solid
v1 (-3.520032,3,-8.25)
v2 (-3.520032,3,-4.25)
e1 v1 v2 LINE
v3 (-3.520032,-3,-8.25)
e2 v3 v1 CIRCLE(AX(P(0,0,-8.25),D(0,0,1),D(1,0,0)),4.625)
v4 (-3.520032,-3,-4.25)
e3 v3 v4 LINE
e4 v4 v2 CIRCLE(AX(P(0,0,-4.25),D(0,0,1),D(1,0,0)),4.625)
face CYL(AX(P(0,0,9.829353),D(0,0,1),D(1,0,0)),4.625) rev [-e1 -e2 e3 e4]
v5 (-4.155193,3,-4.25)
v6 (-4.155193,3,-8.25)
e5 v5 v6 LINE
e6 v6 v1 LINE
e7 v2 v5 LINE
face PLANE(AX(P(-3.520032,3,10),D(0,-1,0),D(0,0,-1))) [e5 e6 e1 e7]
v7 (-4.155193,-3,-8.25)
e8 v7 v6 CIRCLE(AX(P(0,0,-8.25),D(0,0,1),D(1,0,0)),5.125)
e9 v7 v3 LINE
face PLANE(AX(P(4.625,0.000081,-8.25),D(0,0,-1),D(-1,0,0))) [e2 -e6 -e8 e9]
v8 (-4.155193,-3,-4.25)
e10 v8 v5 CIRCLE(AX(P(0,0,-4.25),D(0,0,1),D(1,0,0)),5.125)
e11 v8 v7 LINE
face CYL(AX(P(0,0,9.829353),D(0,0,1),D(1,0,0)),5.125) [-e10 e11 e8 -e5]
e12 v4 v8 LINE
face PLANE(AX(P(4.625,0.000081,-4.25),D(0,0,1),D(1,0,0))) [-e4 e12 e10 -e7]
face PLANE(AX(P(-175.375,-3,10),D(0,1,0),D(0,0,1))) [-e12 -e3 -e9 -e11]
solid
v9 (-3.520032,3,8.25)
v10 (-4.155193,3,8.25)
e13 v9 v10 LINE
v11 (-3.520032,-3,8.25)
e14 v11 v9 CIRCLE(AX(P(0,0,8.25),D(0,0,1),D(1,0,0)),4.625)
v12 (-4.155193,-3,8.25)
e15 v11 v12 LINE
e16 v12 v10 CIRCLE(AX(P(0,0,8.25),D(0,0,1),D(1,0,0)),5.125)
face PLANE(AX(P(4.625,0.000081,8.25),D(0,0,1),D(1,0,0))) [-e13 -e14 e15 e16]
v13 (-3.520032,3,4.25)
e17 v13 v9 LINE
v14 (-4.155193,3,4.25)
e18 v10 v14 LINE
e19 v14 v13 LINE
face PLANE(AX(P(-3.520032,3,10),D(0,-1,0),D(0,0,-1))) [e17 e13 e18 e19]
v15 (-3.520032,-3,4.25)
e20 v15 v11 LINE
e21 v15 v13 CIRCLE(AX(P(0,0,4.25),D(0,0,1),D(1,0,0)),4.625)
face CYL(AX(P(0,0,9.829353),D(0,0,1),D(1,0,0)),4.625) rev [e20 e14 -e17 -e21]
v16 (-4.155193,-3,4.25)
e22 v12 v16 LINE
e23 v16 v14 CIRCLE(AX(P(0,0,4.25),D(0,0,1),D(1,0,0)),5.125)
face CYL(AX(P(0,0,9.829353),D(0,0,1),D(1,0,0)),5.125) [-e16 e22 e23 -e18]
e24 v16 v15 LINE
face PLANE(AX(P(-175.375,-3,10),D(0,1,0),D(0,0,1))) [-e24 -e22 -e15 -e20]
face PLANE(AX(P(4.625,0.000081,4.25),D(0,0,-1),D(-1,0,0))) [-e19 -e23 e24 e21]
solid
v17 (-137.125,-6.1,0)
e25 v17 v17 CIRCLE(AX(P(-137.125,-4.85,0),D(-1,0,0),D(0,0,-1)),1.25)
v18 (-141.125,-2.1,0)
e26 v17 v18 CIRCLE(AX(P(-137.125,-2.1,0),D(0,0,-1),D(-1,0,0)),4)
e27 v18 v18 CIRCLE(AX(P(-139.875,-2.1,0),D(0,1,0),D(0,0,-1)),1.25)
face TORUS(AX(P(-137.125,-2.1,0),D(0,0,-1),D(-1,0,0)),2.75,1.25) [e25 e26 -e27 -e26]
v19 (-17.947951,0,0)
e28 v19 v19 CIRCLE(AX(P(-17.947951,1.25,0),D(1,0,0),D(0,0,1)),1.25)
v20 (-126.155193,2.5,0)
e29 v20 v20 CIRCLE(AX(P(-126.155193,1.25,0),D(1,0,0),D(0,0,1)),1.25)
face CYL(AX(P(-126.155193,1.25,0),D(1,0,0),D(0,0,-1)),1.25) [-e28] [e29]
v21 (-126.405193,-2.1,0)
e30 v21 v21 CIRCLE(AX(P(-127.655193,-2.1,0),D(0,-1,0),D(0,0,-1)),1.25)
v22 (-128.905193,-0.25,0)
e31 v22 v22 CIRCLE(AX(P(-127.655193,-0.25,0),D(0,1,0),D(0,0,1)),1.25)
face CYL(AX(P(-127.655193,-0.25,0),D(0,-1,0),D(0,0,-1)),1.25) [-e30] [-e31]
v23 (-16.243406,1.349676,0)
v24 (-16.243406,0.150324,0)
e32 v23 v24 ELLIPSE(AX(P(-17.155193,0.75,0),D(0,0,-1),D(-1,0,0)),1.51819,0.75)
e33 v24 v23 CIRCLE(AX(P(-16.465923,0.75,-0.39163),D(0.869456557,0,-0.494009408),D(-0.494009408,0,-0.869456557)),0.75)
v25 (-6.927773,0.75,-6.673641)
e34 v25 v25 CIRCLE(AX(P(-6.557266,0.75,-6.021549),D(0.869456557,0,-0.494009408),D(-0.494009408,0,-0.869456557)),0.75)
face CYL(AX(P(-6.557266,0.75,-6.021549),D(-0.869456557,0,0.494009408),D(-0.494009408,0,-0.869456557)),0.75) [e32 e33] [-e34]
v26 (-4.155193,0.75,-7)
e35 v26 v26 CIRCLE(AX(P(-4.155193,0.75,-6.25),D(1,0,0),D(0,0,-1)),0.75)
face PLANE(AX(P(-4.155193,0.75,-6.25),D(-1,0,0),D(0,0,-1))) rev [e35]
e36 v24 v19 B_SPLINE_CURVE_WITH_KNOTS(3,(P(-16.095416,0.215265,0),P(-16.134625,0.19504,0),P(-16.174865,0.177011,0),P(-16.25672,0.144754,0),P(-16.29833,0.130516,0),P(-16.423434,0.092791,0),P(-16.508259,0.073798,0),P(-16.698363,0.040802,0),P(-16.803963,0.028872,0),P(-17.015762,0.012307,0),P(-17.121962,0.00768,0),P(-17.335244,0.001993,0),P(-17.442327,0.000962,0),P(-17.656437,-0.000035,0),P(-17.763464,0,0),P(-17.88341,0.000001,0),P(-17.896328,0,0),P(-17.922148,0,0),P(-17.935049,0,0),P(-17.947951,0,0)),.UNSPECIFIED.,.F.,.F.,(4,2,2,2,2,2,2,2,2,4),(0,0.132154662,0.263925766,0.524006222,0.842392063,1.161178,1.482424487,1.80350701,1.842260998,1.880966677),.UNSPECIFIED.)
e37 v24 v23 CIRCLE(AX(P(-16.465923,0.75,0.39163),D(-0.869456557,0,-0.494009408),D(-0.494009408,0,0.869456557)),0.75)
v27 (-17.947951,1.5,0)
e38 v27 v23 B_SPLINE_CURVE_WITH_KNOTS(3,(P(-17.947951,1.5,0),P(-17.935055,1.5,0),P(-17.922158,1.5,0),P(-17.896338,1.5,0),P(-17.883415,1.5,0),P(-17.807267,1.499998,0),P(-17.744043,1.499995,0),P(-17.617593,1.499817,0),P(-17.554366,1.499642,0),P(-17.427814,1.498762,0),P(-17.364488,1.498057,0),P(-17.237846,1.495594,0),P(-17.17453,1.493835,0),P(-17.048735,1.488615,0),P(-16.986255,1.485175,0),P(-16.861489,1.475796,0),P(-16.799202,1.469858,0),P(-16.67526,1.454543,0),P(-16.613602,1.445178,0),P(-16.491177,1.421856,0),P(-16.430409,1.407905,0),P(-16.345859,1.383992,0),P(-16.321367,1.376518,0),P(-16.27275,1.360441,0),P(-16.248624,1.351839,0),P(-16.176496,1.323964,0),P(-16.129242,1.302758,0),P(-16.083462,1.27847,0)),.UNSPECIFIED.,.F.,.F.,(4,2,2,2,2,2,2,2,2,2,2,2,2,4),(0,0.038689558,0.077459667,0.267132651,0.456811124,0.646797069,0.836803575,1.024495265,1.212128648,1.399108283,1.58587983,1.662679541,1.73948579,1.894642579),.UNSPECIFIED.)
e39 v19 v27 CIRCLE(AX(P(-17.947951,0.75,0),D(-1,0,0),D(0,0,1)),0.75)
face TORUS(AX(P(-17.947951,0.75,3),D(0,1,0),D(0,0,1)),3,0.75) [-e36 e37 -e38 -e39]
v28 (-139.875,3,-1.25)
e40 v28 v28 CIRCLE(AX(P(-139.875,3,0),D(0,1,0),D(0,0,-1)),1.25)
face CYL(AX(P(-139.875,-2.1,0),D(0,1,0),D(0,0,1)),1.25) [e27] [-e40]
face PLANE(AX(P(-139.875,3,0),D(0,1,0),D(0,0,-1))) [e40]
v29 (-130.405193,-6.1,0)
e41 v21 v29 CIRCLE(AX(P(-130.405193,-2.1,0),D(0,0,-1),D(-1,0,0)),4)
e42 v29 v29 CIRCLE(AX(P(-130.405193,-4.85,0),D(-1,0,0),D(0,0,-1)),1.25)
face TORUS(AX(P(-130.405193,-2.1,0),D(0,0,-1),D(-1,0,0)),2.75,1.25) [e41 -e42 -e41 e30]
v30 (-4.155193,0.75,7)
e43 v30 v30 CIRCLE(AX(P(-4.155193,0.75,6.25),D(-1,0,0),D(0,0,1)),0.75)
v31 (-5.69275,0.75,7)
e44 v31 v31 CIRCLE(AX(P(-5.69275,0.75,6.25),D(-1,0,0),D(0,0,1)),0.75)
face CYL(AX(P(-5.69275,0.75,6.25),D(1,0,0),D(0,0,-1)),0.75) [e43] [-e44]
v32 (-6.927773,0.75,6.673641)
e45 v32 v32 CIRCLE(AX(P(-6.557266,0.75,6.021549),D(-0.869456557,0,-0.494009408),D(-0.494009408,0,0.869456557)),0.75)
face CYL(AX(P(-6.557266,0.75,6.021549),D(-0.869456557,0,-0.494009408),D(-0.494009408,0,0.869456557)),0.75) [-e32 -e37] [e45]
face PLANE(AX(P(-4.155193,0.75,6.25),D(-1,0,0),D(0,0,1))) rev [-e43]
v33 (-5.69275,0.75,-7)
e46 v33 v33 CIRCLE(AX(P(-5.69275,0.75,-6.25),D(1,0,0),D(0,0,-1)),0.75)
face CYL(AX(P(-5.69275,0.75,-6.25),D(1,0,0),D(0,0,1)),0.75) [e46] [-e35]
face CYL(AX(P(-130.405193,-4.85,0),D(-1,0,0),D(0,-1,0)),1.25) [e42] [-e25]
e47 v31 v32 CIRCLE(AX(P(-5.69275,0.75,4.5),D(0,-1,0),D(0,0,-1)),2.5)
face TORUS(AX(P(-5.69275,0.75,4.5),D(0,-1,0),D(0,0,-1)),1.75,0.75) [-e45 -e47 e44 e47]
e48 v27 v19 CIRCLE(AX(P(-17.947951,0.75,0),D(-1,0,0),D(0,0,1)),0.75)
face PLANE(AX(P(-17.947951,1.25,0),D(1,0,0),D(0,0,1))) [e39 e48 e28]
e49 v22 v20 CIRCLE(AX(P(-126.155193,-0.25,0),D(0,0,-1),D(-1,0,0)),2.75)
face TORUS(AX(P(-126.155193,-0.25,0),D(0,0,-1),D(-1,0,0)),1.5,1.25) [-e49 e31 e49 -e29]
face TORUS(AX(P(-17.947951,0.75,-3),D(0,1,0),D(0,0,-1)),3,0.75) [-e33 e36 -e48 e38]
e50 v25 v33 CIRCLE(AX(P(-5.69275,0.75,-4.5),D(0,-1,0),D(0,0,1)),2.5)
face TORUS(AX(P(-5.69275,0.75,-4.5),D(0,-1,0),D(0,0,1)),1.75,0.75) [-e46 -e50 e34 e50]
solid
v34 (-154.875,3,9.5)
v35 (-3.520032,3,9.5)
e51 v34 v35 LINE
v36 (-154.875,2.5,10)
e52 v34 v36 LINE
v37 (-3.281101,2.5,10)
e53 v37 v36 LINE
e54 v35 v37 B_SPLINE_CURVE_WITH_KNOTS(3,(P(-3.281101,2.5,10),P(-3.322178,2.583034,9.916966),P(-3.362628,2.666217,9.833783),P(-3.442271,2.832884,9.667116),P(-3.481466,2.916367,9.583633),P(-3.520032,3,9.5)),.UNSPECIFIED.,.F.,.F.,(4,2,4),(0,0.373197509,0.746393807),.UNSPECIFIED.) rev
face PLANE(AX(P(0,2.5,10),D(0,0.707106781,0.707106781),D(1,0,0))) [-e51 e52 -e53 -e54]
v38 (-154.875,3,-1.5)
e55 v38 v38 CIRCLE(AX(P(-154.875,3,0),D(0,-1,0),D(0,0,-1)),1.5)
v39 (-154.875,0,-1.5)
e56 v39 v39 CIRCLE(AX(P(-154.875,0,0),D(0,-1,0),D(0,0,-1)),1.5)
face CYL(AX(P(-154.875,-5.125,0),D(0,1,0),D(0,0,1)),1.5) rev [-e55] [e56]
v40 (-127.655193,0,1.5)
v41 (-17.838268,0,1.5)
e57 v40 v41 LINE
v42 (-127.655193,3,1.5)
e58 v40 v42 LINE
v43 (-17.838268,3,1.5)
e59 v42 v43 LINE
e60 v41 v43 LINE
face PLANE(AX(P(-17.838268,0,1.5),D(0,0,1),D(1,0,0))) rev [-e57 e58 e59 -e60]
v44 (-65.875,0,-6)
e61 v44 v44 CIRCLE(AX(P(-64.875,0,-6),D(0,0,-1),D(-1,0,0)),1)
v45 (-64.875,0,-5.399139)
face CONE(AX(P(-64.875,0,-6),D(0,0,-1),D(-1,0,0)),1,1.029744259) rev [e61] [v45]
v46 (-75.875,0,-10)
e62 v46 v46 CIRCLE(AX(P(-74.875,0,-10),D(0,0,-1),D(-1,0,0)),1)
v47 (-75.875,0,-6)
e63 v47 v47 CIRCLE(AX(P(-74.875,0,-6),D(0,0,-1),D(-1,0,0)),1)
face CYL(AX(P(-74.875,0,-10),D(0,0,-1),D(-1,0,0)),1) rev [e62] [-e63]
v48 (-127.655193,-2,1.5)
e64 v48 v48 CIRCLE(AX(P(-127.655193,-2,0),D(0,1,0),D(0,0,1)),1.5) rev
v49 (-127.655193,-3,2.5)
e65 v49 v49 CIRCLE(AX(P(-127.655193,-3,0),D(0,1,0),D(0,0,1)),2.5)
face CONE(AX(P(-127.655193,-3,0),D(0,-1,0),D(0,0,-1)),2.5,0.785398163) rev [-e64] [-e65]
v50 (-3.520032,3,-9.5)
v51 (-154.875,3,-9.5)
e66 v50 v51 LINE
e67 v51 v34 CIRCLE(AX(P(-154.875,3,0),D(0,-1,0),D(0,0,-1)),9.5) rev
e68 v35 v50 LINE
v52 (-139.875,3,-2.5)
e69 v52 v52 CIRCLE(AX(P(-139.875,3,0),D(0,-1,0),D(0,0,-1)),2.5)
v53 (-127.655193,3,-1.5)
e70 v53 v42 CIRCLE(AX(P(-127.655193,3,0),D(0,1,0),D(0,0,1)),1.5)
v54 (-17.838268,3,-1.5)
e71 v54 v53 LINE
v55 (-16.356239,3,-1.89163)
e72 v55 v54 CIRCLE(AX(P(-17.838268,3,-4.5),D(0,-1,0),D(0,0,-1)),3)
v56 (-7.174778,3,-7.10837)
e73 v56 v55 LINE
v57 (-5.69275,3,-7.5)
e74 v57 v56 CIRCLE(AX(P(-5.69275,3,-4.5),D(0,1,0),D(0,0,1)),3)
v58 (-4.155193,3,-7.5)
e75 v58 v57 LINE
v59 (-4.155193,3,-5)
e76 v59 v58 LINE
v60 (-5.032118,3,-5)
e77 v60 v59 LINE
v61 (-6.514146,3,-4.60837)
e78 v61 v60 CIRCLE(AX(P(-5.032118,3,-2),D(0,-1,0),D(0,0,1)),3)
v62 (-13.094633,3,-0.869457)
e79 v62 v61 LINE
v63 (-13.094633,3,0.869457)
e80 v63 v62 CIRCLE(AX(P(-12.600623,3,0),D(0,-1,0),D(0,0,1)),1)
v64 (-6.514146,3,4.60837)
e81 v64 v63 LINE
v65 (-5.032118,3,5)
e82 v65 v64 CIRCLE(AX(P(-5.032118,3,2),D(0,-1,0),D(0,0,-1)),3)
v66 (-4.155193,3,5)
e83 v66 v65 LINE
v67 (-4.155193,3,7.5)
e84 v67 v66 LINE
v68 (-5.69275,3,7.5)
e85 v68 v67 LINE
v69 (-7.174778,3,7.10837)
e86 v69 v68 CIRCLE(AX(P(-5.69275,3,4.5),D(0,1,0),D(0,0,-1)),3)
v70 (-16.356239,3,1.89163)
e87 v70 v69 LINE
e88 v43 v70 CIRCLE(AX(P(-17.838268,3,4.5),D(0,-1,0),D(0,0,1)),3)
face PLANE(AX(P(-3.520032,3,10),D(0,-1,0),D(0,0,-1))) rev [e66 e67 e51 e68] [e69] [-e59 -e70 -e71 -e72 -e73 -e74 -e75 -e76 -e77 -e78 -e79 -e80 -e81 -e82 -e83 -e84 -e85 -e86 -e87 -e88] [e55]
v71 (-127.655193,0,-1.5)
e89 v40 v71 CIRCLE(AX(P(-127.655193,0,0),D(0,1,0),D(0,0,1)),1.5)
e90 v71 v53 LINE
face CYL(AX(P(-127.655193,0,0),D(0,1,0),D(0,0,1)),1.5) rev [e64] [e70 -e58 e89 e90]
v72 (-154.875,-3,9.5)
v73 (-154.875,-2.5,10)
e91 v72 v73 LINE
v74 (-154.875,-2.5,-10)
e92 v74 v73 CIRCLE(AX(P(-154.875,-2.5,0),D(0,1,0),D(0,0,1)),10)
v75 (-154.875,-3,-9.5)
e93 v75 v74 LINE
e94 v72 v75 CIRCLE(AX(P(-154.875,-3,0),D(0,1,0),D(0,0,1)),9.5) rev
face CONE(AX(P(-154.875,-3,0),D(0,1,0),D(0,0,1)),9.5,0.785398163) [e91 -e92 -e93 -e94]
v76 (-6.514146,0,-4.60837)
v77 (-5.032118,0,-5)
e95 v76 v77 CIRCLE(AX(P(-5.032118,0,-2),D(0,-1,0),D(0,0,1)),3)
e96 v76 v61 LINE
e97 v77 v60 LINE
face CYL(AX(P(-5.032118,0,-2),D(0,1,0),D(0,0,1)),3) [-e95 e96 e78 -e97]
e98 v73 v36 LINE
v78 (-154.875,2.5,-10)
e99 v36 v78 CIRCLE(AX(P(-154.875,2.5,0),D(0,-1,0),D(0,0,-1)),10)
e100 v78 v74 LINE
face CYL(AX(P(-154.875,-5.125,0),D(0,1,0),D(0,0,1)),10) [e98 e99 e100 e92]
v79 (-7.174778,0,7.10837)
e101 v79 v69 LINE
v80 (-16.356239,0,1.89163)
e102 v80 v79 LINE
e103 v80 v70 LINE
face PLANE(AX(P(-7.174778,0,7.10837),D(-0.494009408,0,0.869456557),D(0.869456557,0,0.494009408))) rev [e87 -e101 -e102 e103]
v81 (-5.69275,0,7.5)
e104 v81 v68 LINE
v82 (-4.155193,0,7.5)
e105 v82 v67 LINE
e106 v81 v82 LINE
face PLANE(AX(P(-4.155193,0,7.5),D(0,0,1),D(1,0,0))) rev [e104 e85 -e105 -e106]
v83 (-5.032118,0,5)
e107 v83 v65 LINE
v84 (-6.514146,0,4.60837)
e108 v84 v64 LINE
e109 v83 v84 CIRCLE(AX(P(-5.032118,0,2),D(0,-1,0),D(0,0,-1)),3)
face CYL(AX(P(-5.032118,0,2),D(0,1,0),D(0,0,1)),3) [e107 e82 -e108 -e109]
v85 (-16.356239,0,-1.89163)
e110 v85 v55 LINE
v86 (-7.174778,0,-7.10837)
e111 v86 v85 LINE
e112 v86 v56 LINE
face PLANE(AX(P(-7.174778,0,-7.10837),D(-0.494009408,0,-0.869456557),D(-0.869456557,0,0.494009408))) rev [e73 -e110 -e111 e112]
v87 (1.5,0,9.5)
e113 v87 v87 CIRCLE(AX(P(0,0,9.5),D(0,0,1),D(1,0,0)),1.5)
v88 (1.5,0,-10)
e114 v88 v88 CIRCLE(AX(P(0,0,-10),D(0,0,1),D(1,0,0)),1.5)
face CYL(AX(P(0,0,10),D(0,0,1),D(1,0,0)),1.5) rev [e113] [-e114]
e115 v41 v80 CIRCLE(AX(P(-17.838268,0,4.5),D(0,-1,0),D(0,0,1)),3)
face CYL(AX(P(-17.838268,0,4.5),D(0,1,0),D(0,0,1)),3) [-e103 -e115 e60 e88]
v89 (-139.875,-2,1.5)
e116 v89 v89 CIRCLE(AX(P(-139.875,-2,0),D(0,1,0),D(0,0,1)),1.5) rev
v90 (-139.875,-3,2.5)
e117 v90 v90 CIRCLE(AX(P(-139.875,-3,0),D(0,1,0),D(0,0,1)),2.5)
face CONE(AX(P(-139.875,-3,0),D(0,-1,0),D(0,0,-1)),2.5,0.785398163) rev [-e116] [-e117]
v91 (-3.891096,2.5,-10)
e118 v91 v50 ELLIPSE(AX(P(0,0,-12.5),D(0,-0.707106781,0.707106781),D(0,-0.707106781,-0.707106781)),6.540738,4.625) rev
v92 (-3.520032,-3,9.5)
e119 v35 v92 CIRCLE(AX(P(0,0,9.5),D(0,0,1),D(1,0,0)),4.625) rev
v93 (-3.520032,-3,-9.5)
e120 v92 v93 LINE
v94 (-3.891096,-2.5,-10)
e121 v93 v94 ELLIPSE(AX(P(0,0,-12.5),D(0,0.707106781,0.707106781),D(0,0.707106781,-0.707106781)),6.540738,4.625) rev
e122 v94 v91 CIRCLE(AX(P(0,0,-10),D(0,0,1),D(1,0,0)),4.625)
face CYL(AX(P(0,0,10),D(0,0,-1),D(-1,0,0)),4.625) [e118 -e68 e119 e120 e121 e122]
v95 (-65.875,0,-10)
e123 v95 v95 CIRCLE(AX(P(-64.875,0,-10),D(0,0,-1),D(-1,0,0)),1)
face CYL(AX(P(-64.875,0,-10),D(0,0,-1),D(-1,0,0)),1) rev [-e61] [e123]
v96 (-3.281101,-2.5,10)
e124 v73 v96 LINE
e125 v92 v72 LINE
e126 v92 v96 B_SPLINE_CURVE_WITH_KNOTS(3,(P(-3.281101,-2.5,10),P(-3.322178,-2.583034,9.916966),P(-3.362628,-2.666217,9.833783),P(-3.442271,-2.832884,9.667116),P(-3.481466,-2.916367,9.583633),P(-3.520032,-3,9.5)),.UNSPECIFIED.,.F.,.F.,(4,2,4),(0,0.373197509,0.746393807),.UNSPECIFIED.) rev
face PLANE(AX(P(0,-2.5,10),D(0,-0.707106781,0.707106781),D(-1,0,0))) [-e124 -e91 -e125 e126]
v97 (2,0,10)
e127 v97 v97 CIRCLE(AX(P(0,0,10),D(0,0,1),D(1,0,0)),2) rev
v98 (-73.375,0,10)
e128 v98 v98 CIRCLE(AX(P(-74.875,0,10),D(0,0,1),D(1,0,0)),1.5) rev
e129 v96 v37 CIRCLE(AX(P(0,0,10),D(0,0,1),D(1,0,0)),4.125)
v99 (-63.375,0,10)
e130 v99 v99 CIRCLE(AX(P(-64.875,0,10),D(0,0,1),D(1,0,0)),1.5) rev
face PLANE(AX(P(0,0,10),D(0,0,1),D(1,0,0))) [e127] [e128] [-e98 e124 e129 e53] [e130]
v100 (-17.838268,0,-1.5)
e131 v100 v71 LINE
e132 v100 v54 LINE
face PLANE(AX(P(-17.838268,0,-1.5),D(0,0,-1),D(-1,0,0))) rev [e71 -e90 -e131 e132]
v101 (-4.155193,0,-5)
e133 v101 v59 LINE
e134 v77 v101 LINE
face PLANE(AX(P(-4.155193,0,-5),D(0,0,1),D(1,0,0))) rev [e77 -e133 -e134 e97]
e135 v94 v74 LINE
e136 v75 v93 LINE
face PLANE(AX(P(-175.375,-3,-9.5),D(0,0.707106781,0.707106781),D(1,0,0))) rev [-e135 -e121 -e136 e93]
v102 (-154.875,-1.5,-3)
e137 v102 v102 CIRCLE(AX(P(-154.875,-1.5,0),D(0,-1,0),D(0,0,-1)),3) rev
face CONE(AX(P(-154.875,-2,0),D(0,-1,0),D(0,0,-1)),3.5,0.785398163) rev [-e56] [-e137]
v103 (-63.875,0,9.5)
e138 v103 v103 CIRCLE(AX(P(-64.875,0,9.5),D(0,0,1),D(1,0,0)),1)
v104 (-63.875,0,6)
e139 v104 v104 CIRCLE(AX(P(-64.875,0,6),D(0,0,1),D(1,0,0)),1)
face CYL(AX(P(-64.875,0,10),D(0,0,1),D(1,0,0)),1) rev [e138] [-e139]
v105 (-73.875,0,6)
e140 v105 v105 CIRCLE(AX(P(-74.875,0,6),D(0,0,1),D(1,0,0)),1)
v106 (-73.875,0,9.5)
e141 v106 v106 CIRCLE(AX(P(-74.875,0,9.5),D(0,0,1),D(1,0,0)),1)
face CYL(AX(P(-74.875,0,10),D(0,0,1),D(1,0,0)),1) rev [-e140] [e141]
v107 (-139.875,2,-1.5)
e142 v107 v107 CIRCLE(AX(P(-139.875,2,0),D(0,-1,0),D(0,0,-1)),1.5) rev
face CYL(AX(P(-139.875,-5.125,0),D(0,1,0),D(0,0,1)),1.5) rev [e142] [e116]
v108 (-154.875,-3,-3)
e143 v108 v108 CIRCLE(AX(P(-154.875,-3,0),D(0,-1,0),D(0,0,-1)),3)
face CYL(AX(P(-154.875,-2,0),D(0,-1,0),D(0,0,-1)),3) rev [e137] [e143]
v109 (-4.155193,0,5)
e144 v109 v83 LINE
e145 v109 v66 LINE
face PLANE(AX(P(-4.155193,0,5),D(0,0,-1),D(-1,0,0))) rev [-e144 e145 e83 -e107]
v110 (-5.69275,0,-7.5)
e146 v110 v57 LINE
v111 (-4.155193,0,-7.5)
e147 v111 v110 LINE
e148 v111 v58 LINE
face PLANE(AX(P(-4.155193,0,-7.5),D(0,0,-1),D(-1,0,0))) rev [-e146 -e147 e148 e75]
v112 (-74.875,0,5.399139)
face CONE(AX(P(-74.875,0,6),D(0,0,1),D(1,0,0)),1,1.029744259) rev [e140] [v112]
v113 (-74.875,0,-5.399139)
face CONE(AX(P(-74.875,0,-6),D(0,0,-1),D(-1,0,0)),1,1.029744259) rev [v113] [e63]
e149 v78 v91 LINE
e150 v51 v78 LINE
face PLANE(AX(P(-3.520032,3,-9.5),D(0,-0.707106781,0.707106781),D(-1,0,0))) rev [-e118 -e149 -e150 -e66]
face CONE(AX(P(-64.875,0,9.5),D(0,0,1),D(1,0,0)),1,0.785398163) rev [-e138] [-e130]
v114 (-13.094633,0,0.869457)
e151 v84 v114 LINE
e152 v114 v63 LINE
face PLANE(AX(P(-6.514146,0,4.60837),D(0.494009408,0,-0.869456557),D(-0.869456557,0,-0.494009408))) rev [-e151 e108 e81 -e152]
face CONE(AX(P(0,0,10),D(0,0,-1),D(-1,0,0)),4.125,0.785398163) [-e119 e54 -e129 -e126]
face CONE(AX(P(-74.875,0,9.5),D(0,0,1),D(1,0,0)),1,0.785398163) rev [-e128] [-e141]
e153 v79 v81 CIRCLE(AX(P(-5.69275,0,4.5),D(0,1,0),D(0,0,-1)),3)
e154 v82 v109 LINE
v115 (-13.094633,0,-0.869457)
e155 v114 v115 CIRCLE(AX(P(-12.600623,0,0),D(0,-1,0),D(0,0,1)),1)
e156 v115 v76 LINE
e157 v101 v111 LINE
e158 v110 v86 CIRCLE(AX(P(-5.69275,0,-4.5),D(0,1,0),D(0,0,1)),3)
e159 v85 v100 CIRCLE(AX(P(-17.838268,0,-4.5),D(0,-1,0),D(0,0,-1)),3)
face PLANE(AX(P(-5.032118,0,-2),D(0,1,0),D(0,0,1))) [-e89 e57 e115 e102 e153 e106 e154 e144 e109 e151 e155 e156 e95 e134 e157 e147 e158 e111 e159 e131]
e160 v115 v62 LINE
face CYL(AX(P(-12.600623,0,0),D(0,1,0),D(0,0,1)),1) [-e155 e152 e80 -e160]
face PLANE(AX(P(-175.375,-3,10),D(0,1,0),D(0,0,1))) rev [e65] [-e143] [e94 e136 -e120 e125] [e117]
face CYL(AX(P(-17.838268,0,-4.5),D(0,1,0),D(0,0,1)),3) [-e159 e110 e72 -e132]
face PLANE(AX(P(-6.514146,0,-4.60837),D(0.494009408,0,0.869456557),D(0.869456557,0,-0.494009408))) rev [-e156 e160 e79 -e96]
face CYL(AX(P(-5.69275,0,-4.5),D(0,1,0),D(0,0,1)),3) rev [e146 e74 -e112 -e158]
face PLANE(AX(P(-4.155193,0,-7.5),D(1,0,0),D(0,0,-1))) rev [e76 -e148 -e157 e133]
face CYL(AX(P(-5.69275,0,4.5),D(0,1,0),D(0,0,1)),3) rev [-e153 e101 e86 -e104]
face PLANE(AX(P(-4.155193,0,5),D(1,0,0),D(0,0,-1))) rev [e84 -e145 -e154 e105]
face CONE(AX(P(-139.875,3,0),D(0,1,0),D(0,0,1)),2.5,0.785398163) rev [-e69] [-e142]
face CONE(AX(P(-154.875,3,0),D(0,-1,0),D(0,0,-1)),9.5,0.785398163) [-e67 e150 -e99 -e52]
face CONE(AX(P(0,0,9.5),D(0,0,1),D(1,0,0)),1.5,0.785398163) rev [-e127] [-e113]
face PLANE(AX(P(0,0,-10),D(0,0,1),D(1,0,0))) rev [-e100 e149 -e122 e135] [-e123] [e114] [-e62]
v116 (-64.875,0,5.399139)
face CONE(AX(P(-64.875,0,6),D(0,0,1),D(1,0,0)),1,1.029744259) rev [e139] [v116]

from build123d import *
from build123d.topology import SkipClean

# Parameters (mm, degrees)
SALIENTE_EXTRUIR1_DEPTH                = 10
REVOLUCI_N1_START                      = -8.25
REVOLUCI_N1_DEPTH                      = 4
REVOLUCI_N1_START_2                    = 4.25
REVOLUCI_N1_2_DEPTH                    = 4
CORTAR_EXTRUIR1_DEPTH                  = 3
CORTAR_EXTRUIR2_DEPTH                  = 176.734618815
CORTAR_EXTRUIR2_DEPTH_BACK             = 176.734618815
CROQUIS5_R                             = 1.5
CROQUIS7_W                             = 1.5
CROQUIS7_H                             = 20
CHAFL_N1_SIZE                          = 1
CROQUIS8_R                             = 3
CORTAR_EXTRUIR3_DEPTH                  = 1
CHAFL_N2_SIZE                          = 2
CROQUIS9_R                             = 0.75
CROQUIS14_R                            = 1.25
DI_METRO_DE_TALADRO_2_0_2_1_AT_2_COUNT = 2
DI_METRO_DE_TALADRO_2_0_2_1_AT_2_PITCH = 10
CROQUIS18_R                            = 1.25
CHAFL_N3_SIZE                          = 0.5


# Read off the part's stored shape, not the designer's step: Revolución1
with BuildPart() as part:
    # Croquis1 → Saliente-Extruir1 (new, symmetric)
    with BuildSketch(Plane.XY):
        with BuildLine():
            Line((-175.375, 3), (-175.375, -3))
            Line((-175.375, -3), (-3.52003196, -3))
            ThreePointArc((-3.52003196, -3), (4.625, 0), (-3.52003196, 3))
            Line((-3.52003196, 3), (-175.375, 3))
        make_face()
    extrude(amount=SALIENTE_EXTRUIR1_DEPTH, both=True)

    # Croquis4 → Cortar-Extruir1 (cut)
    with BuildSketch(Plane(origin=(0, 3, 0), x_dir=(1, 0, 0), z_dir=(0, 1, 0))):
        with BuildLine():
            Line((-4.155192535, 7.5), (-5.692749875, 7.5))
            ThreePointArc((-5.692749875, 7.5), (-6.459199802, 7.400440399), (-7.174778097, 7.108369672))
            Line((-7.174778097, 7.108369672), (-16.356239343, 1.891630328))
            ThreePointArc((-16.356239343, 1.891630328), (-17.071817639, 1.599559601), (-17.838267566, 1.5))
            Line((-17.838267566, 1.5), (-127.655192535, 1.5))
            ThreePointArc((-127.655192535, 1.5), (-129.155192535, 0), (-127.655192535, -1.5))
            Line((-127.655192535, -1.5), (-17.838267566, -1.5))
            ThreePointArc((-17.838267566, -1.5), (-17.071817639, -1.599559601), (-16.356239343, -1.891630328))
            Line((-16.356239343, -1.891630328), (-7.174778097, -7.108369672))
            ThreePointArc((-7.174778097, -7.108369672), (-6.459199802, -7.400440399), (-5.692749875, -7.5))
            Line((-5.692749875, -7.5), (-4.155192535, -7.5))
            Line((-4.155192535, -7.5), (-4.155192535, -5))
            Line((-4.155192535, -5), (-5.032117503, -5))
            ThreePointArc((-5.032117503, -5), (-5.798567431, -4.900440399), (-6.514145726, -4.608369672))
            Line((-6.514145726, -4.608369672), (-13.094632808, -0.869456557))
            ThreePointArc((-13.094632808, -0.869456557), (-13.6006234, 0), (-13.094632808, 0.869456557))
            Line((-13.094632808, 0.869456557), (-6.514145726, 4.608369672))
            ThreePointArc((-6.514145726, 4.608369672), (-5.798567431, 4.900440399), (-5.032117503, 5))
            Line((-5.032117503, 5), (-4.155192535, 5))
            Line((-4.155192535, 5), (-4.155192535, 7.5))
        make_face()
    extrude(amount=-CORTAR_EXTRUIR1_DEPTH, mode=Mode.SUBTRACT)

    # Croquis5 → Cortar-Extruir2 (cut, two sides: drawn at the far end of the back side and taken through both)
    with SkipClean():  # the faces are left unmerged after this step: merging them gives an invalid solid
        with BuildSketch(Plane(origin=(0, 0, 0), x_dir=(1, 0, 0), z_dir=(0, 1, 0)).offset(-CORTAR_EXTRUIR2_DEPTH_BACK)):
            with Locations(Location((-127.655192535, 0, 0), (0, 0, 270))):
                Circle(CROQUIS5_R)
            with Locations(Location((-154.875, 0, 0), (0, 0, 270))):
                Circle(CROQUIS5_R)
            with Locations(Location((-139.875, 0, 0), (0, 0, 270))):
                Circle(CROQUIS5_R)
            with BuildLine():
                Line((-154.875, -10), (-175.375, -10))
                Line((-175.375, -10), (-175.375, 10))
                Line((-175.375, 10), (-154.875, 10))
                ThreePointArc((-154.875, 10), (-164.875, 0), (-154.875, -10))
            make_face()
        extrude(amount=CORTAR_EXTRUIR2_DEPTH + CORTAR_EXTRUIR2_DEPTH_BACK, mode=Mode.SUBTRACT)
    add(part.part.scale(1), mode=Mode.REPLACE)  # the faces are merged on a copy

    # Croquis7 → Taladros de espiga de Ø3.0mm2 (revolve, cut)
    with BuildSketch(Plane(origin=(0, 0, 10), x_dir=(0, -1, 0), z_dir=(1, 0, 0))):
        with Locations((0.75, 10)):
            Rectangle(CROQUIS7_W, CROQUIS7_H)
    revolve(axis=Axis((0, 0, 16.35), (0, 0, -1)), mode=Mode.SUBTRACT)

    # Chaflán1
    chafl_n1_edges = [part.edges().sort_by_distance(p)[0] for p in [
        (-139.875, -3, -1.5),
        (-139.875, 3, -1.5),
        (-127.655192535, -3, -1.5),
    ]]
    chamfer(chafl_n1_edges, length=CHAFL_N1_SIZE)

    # Croquis8 → Cortar-Extruir3 (cut)
    with BuildSketch(Plane.XZ.offset(3)):
        with Locations(Location((-154.875, 0, 0), (0, 0, 270))):
            Circle(CROQUIS8_R)
    extrude(amount=-CORTAR_EXTRUIR3_DEPTH, mode=Mode.SUBTRACT)

    # Chaflán2
    # the kernel refuses this chamfer: 2 mm, written as the material it takes off along each edge
    with BuildSketch(Plane(origin=(-154.875, -2, 0), x_dir=(0, 0, 1), z_dir=(-1, 0, 0))) as chafl_n2_piece_1_section:
        Polygon((1.5, CHAFL_N2_SIZE), (1.5 + CHAFL_N2_SIZE, 0), (1.5, 0), align=None)
    chafl_n2_piece_1 = revolve(axis=Axis((-154.875, -2, 0), (0, 1, 0)), mode=Mode.PRIVATE)
    chafl_n2_piece_1 = chafl_n2_piece_1 & Plane(origin=(-154.875, -0.742805432, 0), x_dir=(0, 0, -1), z_dir=(0, -1, 0)) * Cylinder(3, 14, mode=Mode.PRIVATE)
    add(chafl_n2_piece_1, mode=Mode.SUBTRACT)

    # Croquis15 → Diámetro de taladro Ø2.0 (2)1 (revolve, cut)
    with BuildSketch(Plane(origin=(-74.875, 0, 10), x_dir=(0, -1, 0), z_dir=(1, 0, 0))):
        Polygon((0, 0), (0, 4.600860619), (1, 4), (1, 0), align=None)
    di_metro_de_taladro_2_0_2_1 = revolve(axis=Axis((-74.875, 0, 16.35), (0, 0, -1)), mode=Mode.SUBTRACT)

    # Diámetro de taladro Ø2.0 (2)1 at 2: Diámetro de taladro Ø2.0 (2)1 ×2
    with Locations(*[(i * DI_METRO_DE_TALADRO_2_0_2_1_AT_2_PITCH, 0, 0) for i in range(1, DI_METRO_DE_TALADRO_2_0_2_1_AT_2_COUNT)]):
        add(di_metro_de_taladro_2_0_2_1, mode=Mode.SUBTRACT)

    # Simetría2: Diámetro de taladro Ø2.0 (2)1 across plane
    add(di_metro_de_taladro_2_0_2_1.mirror(Plane.XY), mode=Mode.SUBTRACT)

    # Simetría2 copy 1 sketch → Simetría2 copy 1 (revolve, cut)
    with BuildSketch(Plane(origin=(-64.875, 0, -10), x_dir=(0, -1, 0), z_dir=(1, 0, 0))):
        Polygon((0, 0), (0, -4.600860619), (1, -4), (1, 0), align=None)
    revolve(axis=Axis((-64.875, 0, -16.35), (0, 0, -1)), mode=Mode.SUBTRACT)

    # Chaflán3
    chafl_n3_edges = [part.edges().sort_by_distance(p)[0] for p in [
        (0, 1.5, 10),
        (4.625, 0, 10),
        (-64.875, 1, 10),
        (-74.875, 1, 10),
        (-79.19751598, 3, 10),
        (-79.19751598, 3, -10),
        (-79.19751598, -3, -10),
        (-79.19751598, -3, 10),
        (-164.875, 3, 0),
        (-164.875, -3, 0),
    ]]
    chamfer(chafl_n3_edges, length=CHAFL_N3_SIZE)


with BuildPart() as body_2:
    # Revolución1 outline → Revolución1 (new body)
    with BuildSketch(Plane.XY.offset(REVOLUCI_N1_START)):
        with BuildLine():
            ThreePointArc((-3.52003196, 3), (4.625, 0), (-3.52003196, -3))
            Line((-3.52003196, -3), (-4.155192535, -3))
            ThreePointArc((-4.155192535, -3), (5.125, 0), (-4.155192535, 3))
            Line((-4.155192535, 3), (-3.52003196, 3))
        make_face()
    extrude(amount=REVOLUCI_N1_DEPTH)


with BuildPart() as body_3:
    # Revoluci_n1 2 outline → Revoluci_n1 2 (new body)
    with BuildSketch(Plane.XY.offset(REVOLUCI_N1_START_2)):
        with BuildLine():
            ThreePointArc((-3.52003196, 3), (4.625, 0), (-3.52003196, -3))
            Line((-3.52003196, -3), (-4.155192535, -3))
            ThreePointArc((-4.155192535, -3), (5.125, 0), (-4.155192535, 3))
            Line((-4.155192535, 3), (-3.52003196, 3))
        make_face()
    extrude(amount=REVOLUCI_N1_2_DEPTH)


with BuildPart() as body_4:
    # Barrer4: sweep along a path in Croquis10
    with BuildLine(Plane(origin=(0, 0, 0), x_dir=(1, 0, 0), z_dir=(0, 1, 0))) as barrer4_path:
        Line((-4.155192535, -6.25), (-5.692749875, -6.25))
        ThreePointArc((-5.692749875, -6.25), (-6.139845666, -6.191923566), (-6.557266338, -6.021548975))
        Line((-6.557266338, -6.021548975), (-15.738727584, -0.804809631))
        Line((-15.738727584, -0.804809631), (-16.465923158, -0.391630328))
        ThreePointArc((-16.465923158, -0.391630328), (-17.181501453, -0.099559601), (-17.947951381, 0))
        Line((-17.947951381, 0), (-126.155192535, 0))
    # Croquis9 → Barrer4 (sweep)
    with BuildSketch(Plane.ZY.offset(4.155192535)):
        with Locations((6.25, 0.75)):
            Circle(CROQUIS9_R)
    sweep(path=barrer4_path.line)

    # Simetría1: body 4 across plane


with BuildPart() as body_4_1:
    add(body_4.part)
    add(body_4.part.mirror(Plane.XY))

    # Barrer6: sweep along a curve in space
    with BuildLine() as barrer6_path:
        Line((-126.405192535, -0.25, 0), (-126.405192535, -2, 0))
        ThreePointArc((-126.155192535, 0, 0), (-126.33196923, -0.073223305, 0), (-126.405192535, -0.25, 0))
        Line((-126.155192535, 0, 0), (-17.947951381, 0, 0))
    # Croquis14 → Barrer6 (sweep)
    with BuildSketch(Plane(origin=(0, -2, 0), x_dir=(1, 0, 0), z_dir=(0, 1, 0))):
        with Locations((-127.655192535, 0)):
            Circle(CROQUIS14_R)
    sweep(path=barrer6_path.line)

    # Barrer8: sweep along a path in Croquis19
    with BuildLine(Plane.XY) as barrer8_path:
        Line((-128.905192535, -2), (-128.905192535, -2.1))
        ThreePointArc((-128.905192535, -2.1), (-129.344532363, -3.160660172), (-130.405192535, -3.6))
        Line((-130.405192535, -3.6), (-137.125, -3.6))
        ThreePointArc((-137.125, -3.6), (-138.185660172, -3.160660172), (-138.625, -2.1))
        Line((-138.625, -2.1), (-138.625, -2))
        Line((-138.625, -2), (-138.625, 3))
    # Croquis18 → Barrer8 (sweep)
    with BuildSketch(Plane.XZ.offset(2)):
        with Locations((-127.655192535, 0)):
            Circle(CROQUIS18_R)
    sweep(path=barrer8_path.line)


solid = Compound([part.part, body_2.part, body_3.part, body_4_1.part])
